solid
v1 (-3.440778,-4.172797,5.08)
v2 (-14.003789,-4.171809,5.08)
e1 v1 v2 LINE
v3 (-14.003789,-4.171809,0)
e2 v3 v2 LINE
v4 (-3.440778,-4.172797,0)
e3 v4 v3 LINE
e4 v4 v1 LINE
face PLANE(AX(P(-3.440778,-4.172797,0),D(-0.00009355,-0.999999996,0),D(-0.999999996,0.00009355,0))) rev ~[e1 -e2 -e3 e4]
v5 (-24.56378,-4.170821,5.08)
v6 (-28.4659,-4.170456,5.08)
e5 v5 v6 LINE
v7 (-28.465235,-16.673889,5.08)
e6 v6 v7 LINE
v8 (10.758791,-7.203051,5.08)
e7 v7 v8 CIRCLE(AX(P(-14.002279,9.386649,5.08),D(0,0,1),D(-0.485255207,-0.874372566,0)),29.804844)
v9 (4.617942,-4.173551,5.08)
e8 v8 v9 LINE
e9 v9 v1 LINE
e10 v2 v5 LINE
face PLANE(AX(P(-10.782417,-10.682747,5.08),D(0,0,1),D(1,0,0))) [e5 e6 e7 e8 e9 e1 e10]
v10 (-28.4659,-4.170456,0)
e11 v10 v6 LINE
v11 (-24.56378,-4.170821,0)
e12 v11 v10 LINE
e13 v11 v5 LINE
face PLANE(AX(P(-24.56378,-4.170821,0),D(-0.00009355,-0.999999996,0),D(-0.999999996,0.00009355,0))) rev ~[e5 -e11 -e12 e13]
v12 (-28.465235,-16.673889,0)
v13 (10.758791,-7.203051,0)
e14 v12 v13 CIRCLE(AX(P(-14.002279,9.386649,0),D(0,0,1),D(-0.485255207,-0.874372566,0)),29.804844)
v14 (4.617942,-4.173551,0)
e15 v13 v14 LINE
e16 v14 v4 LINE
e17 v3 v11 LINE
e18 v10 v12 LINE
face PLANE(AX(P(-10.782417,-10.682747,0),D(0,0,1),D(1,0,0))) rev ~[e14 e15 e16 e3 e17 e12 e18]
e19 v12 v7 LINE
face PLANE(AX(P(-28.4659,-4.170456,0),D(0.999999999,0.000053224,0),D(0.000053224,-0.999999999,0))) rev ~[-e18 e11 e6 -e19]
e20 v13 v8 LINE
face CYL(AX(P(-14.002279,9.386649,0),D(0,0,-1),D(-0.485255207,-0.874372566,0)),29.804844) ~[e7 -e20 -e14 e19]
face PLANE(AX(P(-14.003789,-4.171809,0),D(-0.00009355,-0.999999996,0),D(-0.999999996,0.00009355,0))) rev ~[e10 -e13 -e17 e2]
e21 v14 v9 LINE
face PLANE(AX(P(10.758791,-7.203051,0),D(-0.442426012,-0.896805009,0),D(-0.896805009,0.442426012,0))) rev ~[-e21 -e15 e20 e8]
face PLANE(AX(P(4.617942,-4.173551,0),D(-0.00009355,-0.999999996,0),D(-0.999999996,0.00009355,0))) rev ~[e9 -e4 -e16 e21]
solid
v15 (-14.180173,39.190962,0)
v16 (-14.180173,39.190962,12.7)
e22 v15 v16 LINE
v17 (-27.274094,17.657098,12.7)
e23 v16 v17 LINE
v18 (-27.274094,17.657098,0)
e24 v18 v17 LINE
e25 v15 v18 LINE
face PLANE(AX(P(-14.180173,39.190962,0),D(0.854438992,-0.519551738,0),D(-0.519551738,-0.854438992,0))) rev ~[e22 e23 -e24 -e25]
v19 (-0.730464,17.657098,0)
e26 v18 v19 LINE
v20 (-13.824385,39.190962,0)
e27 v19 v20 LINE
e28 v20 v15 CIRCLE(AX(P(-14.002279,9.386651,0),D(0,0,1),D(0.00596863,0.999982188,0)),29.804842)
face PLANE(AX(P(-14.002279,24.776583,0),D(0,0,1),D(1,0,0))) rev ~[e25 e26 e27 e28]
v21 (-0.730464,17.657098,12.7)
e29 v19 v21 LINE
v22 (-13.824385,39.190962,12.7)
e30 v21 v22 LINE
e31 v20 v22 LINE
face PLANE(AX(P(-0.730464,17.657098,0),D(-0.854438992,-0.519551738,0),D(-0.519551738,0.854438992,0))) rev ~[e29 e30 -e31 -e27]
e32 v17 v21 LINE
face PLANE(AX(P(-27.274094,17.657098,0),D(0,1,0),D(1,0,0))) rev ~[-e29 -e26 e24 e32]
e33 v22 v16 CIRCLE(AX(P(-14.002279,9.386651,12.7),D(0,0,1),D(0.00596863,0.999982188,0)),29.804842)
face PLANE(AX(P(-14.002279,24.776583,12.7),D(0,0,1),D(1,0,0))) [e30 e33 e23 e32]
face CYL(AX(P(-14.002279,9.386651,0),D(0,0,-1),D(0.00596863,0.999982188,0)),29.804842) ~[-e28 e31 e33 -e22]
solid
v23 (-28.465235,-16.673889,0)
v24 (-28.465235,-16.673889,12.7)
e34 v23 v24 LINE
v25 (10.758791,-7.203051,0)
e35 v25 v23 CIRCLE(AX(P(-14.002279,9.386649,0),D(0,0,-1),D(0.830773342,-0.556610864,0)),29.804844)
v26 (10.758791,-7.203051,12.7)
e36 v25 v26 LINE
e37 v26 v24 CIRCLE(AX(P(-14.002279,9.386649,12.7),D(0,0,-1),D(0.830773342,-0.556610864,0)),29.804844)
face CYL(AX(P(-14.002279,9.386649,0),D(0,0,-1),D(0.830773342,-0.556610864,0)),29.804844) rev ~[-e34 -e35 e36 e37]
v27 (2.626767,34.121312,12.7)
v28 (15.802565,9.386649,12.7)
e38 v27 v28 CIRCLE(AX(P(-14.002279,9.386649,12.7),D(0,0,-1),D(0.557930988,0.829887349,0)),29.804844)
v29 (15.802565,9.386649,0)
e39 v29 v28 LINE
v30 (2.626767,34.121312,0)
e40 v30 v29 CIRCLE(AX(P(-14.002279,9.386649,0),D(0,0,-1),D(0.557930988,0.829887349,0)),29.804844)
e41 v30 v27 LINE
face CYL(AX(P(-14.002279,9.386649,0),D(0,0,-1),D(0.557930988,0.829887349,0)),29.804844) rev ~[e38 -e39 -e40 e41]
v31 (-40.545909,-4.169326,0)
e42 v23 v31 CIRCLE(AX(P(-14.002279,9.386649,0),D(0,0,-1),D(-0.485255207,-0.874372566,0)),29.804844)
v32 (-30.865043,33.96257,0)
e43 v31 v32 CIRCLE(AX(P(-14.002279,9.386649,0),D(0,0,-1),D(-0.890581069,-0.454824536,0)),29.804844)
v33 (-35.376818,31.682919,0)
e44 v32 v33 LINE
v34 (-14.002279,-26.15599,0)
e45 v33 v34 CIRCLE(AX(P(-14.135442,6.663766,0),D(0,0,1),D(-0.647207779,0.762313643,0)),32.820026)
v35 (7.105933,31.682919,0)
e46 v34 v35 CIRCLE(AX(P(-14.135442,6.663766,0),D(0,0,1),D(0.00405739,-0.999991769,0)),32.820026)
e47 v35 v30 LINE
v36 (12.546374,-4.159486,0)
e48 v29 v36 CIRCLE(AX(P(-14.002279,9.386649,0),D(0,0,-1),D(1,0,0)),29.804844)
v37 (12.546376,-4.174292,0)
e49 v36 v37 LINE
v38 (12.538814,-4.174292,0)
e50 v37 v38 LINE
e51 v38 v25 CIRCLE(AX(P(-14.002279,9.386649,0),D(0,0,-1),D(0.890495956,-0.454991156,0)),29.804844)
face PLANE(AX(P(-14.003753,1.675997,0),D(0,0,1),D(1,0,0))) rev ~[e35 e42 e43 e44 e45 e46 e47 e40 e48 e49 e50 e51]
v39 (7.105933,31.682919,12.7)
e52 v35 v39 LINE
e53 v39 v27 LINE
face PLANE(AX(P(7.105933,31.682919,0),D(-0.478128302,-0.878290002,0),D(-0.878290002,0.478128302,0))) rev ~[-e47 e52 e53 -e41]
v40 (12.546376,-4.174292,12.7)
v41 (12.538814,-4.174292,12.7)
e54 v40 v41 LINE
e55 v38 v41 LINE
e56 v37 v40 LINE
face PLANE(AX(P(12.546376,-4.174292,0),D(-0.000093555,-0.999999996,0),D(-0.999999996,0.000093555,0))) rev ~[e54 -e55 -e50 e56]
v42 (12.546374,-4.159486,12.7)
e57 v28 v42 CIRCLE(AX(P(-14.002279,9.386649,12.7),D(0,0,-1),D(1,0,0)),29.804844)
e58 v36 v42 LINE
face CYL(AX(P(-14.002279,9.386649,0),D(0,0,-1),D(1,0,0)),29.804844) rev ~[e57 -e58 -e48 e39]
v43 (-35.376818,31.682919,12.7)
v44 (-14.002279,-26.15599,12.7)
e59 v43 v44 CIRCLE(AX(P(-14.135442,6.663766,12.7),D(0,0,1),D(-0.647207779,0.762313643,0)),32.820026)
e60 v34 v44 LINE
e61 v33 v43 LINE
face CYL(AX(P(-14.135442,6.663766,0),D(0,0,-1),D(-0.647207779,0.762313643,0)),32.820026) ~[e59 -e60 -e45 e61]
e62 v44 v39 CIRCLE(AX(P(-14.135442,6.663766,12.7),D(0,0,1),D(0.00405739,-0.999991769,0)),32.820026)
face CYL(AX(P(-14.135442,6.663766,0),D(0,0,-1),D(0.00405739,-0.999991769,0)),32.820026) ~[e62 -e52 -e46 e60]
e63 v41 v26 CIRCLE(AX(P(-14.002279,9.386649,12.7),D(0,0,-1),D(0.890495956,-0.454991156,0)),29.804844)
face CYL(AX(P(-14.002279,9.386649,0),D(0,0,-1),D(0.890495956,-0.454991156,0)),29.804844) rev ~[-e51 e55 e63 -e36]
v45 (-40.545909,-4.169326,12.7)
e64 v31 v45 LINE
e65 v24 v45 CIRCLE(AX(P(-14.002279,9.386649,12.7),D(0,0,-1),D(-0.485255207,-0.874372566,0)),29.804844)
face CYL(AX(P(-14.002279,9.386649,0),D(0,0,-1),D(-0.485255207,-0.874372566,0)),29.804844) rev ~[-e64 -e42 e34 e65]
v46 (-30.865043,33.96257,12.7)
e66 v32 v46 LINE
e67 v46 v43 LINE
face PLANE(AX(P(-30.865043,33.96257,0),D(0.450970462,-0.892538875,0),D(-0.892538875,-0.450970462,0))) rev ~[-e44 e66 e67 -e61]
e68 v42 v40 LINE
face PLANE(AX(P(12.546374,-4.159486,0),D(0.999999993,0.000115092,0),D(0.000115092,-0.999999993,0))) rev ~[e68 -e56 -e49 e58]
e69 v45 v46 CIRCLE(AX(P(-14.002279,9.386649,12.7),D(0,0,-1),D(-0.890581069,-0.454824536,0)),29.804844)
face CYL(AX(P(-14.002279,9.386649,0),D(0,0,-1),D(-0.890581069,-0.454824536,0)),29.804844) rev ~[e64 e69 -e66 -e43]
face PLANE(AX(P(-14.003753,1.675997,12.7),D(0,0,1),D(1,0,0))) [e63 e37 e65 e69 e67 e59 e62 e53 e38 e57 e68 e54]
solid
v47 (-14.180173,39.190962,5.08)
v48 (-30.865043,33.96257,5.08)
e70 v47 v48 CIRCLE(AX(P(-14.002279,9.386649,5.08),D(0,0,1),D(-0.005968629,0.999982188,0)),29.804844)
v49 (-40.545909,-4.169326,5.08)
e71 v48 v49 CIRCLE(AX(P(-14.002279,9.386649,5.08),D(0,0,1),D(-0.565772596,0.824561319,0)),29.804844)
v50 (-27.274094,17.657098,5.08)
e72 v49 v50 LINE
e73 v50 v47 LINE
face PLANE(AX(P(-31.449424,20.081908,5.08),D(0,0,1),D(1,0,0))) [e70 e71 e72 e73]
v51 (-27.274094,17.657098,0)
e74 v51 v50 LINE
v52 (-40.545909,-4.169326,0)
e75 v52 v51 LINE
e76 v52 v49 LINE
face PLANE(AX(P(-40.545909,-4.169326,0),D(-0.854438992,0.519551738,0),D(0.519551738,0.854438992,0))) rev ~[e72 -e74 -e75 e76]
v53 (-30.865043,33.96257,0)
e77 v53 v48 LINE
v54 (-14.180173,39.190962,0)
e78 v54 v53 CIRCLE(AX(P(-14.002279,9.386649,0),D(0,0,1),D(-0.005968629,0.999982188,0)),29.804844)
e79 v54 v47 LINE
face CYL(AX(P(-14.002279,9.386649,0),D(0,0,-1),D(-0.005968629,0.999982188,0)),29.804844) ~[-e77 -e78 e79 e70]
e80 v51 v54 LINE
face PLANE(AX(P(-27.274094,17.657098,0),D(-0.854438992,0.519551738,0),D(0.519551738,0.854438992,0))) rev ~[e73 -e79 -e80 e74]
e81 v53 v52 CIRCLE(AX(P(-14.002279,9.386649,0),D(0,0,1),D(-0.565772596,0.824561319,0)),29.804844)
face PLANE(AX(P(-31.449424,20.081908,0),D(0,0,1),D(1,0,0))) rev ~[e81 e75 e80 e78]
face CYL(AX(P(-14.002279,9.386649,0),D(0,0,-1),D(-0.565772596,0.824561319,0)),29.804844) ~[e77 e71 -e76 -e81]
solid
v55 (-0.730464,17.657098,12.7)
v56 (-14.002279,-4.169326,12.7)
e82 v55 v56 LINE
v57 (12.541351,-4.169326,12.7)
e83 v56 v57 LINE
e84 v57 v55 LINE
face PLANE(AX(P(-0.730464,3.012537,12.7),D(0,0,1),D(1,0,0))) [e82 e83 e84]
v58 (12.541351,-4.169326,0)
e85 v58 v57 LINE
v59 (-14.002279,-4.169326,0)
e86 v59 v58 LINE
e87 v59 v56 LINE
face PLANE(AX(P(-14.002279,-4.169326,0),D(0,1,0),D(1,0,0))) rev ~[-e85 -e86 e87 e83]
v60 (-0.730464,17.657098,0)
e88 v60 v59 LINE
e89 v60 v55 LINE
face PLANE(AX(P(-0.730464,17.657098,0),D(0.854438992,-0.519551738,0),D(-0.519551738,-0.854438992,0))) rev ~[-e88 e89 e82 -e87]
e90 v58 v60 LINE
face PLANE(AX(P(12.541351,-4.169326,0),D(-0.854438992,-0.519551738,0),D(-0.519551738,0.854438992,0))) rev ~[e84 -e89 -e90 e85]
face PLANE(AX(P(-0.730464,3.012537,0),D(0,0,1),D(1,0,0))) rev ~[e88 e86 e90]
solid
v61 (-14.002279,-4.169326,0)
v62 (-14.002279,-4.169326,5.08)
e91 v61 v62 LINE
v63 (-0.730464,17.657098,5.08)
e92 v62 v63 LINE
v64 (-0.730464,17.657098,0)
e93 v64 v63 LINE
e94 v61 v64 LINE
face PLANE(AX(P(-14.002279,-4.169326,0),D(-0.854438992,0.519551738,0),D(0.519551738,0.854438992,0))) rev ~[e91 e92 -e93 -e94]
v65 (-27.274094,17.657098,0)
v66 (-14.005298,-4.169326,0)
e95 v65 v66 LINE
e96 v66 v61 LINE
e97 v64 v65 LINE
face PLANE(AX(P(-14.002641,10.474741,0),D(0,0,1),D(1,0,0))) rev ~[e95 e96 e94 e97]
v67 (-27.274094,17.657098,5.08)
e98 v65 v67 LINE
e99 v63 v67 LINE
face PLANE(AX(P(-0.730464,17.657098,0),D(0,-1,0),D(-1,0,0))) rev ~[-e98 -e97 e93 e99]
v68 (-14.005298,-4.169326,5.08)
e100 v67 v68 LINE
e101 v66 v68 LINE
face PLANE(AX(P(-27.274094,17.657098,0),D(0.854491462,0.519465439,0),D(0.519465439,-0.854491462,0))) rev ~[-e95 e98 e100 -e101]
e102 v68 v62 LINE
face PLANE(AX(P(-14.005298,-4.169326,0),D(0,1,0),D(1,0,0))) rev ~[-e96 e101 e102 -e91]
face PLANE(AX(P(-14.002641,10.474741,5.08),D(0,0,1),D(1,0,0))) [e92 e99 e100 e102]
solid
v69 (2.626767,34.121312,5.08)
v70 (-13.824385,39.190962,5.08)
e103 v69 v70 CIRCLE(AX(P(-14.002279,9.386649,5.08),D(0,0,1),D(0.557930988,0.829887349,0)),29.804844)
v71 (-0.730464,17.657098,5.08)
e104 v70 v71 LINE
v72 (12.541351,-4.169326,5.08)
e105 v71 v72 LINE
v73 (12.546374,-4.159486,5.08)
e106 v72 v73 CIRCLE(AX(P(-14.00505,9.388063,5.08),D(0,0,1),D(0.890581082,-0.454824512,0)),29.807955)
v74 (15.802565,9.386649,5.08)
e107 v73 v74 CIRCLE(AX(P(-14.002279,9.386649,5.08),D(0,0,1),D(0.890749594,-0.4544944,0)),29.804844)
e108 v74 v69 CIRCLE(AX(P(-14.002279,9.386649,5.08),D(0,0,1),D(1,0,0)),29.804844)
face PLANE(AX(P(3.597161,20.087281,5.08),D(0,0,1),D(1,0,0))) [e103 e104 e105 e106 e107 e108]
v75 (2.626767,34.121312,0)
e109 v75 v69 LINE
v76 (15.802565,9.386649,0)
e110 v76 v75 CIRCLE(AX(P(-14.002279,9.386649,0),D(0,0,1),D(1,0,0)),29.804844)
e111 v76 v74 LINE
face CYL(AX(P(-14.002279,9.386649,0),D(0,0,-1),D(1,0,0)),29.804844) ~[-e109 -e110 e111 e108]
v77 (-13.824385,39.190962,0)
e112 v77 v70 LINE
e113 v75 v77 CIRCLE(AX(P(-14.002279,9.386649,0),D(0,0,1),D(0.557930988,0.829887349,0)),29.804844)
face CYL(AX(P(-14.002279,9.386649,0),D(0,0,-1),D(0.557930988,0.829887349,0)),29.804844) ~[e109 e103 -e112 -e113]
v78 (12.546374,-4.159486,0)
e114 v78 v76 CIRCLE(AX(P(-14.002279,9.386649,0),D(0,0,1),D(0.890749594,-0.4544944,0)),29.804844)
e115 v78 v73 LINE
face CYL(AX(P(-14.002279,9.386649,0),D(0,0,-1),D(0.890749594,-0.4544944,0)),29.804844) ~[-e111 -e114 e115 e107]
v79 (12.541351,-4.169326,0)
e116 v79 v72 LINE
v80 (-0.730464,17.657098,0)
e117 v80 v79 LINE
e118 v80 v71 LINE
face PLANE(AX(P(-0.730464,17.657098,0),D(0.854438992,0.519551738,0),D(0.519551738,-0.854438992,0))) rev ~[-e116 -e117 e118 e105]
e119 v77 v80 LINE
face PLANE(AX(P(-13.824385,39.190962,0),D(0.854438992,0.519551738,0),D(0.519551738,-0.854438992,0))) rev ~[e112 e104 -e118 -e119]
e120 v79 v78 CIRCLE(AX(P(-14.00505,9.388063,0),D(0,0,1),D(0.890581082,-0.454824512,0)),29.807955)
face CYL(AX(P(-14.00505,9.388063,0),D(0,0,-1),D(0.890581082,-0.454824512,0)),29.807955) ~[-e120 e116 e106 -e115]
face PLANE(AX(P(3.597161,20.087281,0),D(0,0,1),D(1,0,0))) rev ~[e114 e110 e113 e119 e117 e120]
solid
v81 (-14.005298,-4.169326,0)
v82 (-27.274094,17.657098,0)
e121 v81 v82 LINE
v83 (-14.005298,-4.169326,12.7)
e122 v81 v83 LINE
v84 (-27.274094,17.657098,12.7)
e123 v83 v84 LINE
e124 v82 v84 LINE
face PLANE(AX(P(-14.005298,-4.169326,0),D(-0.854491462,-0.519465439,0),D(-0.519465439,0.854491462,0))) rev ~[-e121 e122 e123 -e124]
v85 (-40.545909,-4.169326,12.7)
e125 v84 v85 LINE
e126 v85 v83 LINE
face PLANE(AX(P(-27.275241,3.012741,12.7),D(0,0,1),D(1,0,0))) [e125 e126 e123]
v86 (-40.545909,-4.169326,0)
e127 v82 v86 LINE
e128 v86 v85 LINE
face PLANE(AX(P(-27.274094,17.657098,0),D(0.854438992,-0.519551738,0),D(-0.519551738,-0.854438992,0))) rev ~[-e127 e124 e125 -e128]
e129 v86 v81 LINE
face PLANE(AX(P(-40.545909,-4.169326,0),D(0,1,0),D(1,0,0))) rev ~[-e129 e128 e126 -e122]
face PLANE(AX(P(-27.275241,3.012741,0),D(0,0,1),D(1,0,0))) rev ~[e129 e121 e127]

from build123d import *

# Parameters (mm, degrees)
F1_DEPTH = 12.7
F2_DEPTH = 5.08


# Not quite as in the source:
# - a feature names something its author has since deleted; it is built from what else it names


with BuildPart() as f1:
    # F0 (on Top) → F1 (new body)
    with BuildSketch(Plane.XY):
        with BuildLine():
            Line((-0.7304638443, 17.6570977744), (-13.8243847458, 39.1909619838))
            ThreePointArc((-13.8243847458, 39.1909619838), (-14.0022787977, 39.1914928804), (-14.1801728496, 39.1909619839))
            Line((-14.1801728496, 39.1909619839), (-27.2740937544, 17.6570977744))
            Line((-27.2740937544, 17.6570977744), (-0.7304638443, 17.6570977744))
        make_face()
    extrude(amount=F1_DEPTH)


with BuildPart() as f1b:
    # F0 (on Top) → F1, piece 2 (new body)
    with BuildSketch(Plane.XY):
        Polygon((-14.0052981097, -4.1693255842), (-27.2740937544, 17.6570977744), (-40.5459087111, -4.1693255842), (-28.4659001209, -4.1693255842), (-24.5637800544, -4.1693255842), align=None)
    extrude(amount=F1_DEPTH)


with BuildPart() as f1c:
    # F0 (on Top) → F1, piece 3 (new body)
    with BuildSketch(Plane.XY):
        Polygon((4.6093779556, -4.1693255842), (12.5413511092, -4.1693255842), (-0.7304638443, 17.6570977744), (-14.002278801, -4.1693255842), (-3.4407775408, -4.1693255842), align=None)
    extrude(amount=F1_DEPTH)


with BuildPart() as f1d:
    # F0 (on Top) → F1, piece 4 (new body)
    with BuildSketch(Plane.XY):
        with BuildLine():
            ThreePointArc((2.6267673161, 34.121311843), (12.3031850523, 23.3991896828), (15.8025652754, 9.386648804))
            ThreePointArc((15.8025652754, 9.386648804), (14.9770861572, 2.4206501647), (12.5463739719, -4.1594859348))
            Line((12.5463739719, -4.1594859348), (12.546375676, -4.1742923649))
            Line((12.546375676, -4.1742923649), (12.5388143231, -4.1742916575))
            ThreePointArc((12.5388143231, -4.1742916575), (11.6934665545, -5.7149206854), (10.7587911193, -7.2030512181))
            ThreePointArc((10.7587911193, -7.2030512181), (-7.0067815574, -19.5856094569), (-28.4652345808, -16.6738891899))
            ThreePointArc((-28.4652345808, -16.6738891899), (-35.4376711517, -11.3221098549), (-40.5459087111, -4.1693255842))
            ThreePointArc((-40.5459087111, -4.1693255842), (-42.8906697283, 16.7207881569), (-30.8650428104, 33.9625703611))
            Line((-30.8650428104, 33.9625703611), (-35.3768183074, 31.682918978))
            ThreePointArc((-35.3768183074, 31.682918978), (-44.9205686415, -4.7129685745), (-14.0022787977, -26.1559896842))
            ThreePointArc((-14.0022787977, -26.1559896842), (16.6955901847, -4.587967654), (7.1059333978, 31.682918978))
            Line((7.1059333978, 31.682918978), (2.6267673161, 34.121311843))
        make_face()
    extrude(amount=F1_DEPTH)


with BuildPart() as f2:
    # F0 (on Top) → F2 (new body)
    with BuildSketch(Plane.XY):
        Polygon((-14.002278801, -4.1693255842), (-0.7304638443, 17.6570977744), (-27.2740937544, 17.6570977744), (-14.0052981097, -4.1693255842), align=None)
    extrude(amount=F2_DEPTH)


with BuildPart() as f2b:
    # F0 (on Top) → F2, piece 2 (new body)
    with BuildSketch(Plane.XY):
        with BuildLine():
            ThreePointArc((-28.4652345808, -16.6738891899), (-7.0067815574, -19.5856094569), (10.7587911193, -7.2030512181))
            Line((10.7587911193, -7.2030512181), (4.6179422563, -4.1735506603))
            Line((4.6179422563, -4.1735506603), (-3.4407775408, -4.1727967674))
            Line((-3.4407775408, -4.1727967674), (-14.0037886271, -4.1718085983))
            Line((-14.0037886271, -4.1718085983), (-24.5637800544, -4.1708207116))
            Line((-24.5637800544, -4.1708207116), (-28.4659000607, -4.1704556684))
            Line((-28.4659000607, -4.1704556684), (-28.4652345808, -16.6738891899))
        make_face()
    extrude(amount=F2_DEPTH)


with BuildPart() as f2c:
    # F0 (on Top) → F2, piece 3 (new body)
    with BuildSketch(Plane.XY):
        with BuildLine():
            Line((-27.2740937544, 17.6570977744), (-14.1801728496, 39.1909619839))
            ThreePointArc((-14.1801728496, 39.1909619839), (-22.9146312684, 37.8277933645), (-30.8650428104, 33.9625703611))
            ThreePointArc((-30.8650428104, 33.9625703611), (-42.8906697283, 16.7207881569), (-40.5459087111, -4.1693255842))
            Line((-40.5459087111, -4.1693255842), (-27.2740937544, 17.6570977744))
        make_face()
    extrude(amount=F2_DEPTH)


with BuildPart() as f2d:
    # F0 (on Top) → F2, piece 4 (new body)
    with BuildSketch(Plane.XY):
        with BuildLine():
            ThreePointArc((12.5463739719, -4.1594859348), (14.9770861572, 2.4206501647), (15.8025652754, 9.386648804))
            ThreePointArc((15.8025652754, 9.386648804), (12.3031850523, 23.3991896828), (2.6267673161, 34.121311843))
            ThreePointArc((2.6267673161, 34.121311843), (-5.2248277116, 37.8697154014), (-13.8243847458, 39.1909619838))
            Line((-13.8243847458, 39.1909619838), (-0.7304638443, 17.6570977744))
            Line((-0.7304638443, 17.6570977744), (12.5413511092, -4.1693255842))
            ThreePointArc((12.5413511092, -4.1693255842), (12.5438629964, -4.1644059922), (12.5463739719, -4.1594859348))
        make_face()
    extrude(amount=F2_DEPTH)


solid = Compound([f1.part, f1b.part, f1c.part, f1d.part, f2.part, f2b.part, f2c.part, f2d.part])
